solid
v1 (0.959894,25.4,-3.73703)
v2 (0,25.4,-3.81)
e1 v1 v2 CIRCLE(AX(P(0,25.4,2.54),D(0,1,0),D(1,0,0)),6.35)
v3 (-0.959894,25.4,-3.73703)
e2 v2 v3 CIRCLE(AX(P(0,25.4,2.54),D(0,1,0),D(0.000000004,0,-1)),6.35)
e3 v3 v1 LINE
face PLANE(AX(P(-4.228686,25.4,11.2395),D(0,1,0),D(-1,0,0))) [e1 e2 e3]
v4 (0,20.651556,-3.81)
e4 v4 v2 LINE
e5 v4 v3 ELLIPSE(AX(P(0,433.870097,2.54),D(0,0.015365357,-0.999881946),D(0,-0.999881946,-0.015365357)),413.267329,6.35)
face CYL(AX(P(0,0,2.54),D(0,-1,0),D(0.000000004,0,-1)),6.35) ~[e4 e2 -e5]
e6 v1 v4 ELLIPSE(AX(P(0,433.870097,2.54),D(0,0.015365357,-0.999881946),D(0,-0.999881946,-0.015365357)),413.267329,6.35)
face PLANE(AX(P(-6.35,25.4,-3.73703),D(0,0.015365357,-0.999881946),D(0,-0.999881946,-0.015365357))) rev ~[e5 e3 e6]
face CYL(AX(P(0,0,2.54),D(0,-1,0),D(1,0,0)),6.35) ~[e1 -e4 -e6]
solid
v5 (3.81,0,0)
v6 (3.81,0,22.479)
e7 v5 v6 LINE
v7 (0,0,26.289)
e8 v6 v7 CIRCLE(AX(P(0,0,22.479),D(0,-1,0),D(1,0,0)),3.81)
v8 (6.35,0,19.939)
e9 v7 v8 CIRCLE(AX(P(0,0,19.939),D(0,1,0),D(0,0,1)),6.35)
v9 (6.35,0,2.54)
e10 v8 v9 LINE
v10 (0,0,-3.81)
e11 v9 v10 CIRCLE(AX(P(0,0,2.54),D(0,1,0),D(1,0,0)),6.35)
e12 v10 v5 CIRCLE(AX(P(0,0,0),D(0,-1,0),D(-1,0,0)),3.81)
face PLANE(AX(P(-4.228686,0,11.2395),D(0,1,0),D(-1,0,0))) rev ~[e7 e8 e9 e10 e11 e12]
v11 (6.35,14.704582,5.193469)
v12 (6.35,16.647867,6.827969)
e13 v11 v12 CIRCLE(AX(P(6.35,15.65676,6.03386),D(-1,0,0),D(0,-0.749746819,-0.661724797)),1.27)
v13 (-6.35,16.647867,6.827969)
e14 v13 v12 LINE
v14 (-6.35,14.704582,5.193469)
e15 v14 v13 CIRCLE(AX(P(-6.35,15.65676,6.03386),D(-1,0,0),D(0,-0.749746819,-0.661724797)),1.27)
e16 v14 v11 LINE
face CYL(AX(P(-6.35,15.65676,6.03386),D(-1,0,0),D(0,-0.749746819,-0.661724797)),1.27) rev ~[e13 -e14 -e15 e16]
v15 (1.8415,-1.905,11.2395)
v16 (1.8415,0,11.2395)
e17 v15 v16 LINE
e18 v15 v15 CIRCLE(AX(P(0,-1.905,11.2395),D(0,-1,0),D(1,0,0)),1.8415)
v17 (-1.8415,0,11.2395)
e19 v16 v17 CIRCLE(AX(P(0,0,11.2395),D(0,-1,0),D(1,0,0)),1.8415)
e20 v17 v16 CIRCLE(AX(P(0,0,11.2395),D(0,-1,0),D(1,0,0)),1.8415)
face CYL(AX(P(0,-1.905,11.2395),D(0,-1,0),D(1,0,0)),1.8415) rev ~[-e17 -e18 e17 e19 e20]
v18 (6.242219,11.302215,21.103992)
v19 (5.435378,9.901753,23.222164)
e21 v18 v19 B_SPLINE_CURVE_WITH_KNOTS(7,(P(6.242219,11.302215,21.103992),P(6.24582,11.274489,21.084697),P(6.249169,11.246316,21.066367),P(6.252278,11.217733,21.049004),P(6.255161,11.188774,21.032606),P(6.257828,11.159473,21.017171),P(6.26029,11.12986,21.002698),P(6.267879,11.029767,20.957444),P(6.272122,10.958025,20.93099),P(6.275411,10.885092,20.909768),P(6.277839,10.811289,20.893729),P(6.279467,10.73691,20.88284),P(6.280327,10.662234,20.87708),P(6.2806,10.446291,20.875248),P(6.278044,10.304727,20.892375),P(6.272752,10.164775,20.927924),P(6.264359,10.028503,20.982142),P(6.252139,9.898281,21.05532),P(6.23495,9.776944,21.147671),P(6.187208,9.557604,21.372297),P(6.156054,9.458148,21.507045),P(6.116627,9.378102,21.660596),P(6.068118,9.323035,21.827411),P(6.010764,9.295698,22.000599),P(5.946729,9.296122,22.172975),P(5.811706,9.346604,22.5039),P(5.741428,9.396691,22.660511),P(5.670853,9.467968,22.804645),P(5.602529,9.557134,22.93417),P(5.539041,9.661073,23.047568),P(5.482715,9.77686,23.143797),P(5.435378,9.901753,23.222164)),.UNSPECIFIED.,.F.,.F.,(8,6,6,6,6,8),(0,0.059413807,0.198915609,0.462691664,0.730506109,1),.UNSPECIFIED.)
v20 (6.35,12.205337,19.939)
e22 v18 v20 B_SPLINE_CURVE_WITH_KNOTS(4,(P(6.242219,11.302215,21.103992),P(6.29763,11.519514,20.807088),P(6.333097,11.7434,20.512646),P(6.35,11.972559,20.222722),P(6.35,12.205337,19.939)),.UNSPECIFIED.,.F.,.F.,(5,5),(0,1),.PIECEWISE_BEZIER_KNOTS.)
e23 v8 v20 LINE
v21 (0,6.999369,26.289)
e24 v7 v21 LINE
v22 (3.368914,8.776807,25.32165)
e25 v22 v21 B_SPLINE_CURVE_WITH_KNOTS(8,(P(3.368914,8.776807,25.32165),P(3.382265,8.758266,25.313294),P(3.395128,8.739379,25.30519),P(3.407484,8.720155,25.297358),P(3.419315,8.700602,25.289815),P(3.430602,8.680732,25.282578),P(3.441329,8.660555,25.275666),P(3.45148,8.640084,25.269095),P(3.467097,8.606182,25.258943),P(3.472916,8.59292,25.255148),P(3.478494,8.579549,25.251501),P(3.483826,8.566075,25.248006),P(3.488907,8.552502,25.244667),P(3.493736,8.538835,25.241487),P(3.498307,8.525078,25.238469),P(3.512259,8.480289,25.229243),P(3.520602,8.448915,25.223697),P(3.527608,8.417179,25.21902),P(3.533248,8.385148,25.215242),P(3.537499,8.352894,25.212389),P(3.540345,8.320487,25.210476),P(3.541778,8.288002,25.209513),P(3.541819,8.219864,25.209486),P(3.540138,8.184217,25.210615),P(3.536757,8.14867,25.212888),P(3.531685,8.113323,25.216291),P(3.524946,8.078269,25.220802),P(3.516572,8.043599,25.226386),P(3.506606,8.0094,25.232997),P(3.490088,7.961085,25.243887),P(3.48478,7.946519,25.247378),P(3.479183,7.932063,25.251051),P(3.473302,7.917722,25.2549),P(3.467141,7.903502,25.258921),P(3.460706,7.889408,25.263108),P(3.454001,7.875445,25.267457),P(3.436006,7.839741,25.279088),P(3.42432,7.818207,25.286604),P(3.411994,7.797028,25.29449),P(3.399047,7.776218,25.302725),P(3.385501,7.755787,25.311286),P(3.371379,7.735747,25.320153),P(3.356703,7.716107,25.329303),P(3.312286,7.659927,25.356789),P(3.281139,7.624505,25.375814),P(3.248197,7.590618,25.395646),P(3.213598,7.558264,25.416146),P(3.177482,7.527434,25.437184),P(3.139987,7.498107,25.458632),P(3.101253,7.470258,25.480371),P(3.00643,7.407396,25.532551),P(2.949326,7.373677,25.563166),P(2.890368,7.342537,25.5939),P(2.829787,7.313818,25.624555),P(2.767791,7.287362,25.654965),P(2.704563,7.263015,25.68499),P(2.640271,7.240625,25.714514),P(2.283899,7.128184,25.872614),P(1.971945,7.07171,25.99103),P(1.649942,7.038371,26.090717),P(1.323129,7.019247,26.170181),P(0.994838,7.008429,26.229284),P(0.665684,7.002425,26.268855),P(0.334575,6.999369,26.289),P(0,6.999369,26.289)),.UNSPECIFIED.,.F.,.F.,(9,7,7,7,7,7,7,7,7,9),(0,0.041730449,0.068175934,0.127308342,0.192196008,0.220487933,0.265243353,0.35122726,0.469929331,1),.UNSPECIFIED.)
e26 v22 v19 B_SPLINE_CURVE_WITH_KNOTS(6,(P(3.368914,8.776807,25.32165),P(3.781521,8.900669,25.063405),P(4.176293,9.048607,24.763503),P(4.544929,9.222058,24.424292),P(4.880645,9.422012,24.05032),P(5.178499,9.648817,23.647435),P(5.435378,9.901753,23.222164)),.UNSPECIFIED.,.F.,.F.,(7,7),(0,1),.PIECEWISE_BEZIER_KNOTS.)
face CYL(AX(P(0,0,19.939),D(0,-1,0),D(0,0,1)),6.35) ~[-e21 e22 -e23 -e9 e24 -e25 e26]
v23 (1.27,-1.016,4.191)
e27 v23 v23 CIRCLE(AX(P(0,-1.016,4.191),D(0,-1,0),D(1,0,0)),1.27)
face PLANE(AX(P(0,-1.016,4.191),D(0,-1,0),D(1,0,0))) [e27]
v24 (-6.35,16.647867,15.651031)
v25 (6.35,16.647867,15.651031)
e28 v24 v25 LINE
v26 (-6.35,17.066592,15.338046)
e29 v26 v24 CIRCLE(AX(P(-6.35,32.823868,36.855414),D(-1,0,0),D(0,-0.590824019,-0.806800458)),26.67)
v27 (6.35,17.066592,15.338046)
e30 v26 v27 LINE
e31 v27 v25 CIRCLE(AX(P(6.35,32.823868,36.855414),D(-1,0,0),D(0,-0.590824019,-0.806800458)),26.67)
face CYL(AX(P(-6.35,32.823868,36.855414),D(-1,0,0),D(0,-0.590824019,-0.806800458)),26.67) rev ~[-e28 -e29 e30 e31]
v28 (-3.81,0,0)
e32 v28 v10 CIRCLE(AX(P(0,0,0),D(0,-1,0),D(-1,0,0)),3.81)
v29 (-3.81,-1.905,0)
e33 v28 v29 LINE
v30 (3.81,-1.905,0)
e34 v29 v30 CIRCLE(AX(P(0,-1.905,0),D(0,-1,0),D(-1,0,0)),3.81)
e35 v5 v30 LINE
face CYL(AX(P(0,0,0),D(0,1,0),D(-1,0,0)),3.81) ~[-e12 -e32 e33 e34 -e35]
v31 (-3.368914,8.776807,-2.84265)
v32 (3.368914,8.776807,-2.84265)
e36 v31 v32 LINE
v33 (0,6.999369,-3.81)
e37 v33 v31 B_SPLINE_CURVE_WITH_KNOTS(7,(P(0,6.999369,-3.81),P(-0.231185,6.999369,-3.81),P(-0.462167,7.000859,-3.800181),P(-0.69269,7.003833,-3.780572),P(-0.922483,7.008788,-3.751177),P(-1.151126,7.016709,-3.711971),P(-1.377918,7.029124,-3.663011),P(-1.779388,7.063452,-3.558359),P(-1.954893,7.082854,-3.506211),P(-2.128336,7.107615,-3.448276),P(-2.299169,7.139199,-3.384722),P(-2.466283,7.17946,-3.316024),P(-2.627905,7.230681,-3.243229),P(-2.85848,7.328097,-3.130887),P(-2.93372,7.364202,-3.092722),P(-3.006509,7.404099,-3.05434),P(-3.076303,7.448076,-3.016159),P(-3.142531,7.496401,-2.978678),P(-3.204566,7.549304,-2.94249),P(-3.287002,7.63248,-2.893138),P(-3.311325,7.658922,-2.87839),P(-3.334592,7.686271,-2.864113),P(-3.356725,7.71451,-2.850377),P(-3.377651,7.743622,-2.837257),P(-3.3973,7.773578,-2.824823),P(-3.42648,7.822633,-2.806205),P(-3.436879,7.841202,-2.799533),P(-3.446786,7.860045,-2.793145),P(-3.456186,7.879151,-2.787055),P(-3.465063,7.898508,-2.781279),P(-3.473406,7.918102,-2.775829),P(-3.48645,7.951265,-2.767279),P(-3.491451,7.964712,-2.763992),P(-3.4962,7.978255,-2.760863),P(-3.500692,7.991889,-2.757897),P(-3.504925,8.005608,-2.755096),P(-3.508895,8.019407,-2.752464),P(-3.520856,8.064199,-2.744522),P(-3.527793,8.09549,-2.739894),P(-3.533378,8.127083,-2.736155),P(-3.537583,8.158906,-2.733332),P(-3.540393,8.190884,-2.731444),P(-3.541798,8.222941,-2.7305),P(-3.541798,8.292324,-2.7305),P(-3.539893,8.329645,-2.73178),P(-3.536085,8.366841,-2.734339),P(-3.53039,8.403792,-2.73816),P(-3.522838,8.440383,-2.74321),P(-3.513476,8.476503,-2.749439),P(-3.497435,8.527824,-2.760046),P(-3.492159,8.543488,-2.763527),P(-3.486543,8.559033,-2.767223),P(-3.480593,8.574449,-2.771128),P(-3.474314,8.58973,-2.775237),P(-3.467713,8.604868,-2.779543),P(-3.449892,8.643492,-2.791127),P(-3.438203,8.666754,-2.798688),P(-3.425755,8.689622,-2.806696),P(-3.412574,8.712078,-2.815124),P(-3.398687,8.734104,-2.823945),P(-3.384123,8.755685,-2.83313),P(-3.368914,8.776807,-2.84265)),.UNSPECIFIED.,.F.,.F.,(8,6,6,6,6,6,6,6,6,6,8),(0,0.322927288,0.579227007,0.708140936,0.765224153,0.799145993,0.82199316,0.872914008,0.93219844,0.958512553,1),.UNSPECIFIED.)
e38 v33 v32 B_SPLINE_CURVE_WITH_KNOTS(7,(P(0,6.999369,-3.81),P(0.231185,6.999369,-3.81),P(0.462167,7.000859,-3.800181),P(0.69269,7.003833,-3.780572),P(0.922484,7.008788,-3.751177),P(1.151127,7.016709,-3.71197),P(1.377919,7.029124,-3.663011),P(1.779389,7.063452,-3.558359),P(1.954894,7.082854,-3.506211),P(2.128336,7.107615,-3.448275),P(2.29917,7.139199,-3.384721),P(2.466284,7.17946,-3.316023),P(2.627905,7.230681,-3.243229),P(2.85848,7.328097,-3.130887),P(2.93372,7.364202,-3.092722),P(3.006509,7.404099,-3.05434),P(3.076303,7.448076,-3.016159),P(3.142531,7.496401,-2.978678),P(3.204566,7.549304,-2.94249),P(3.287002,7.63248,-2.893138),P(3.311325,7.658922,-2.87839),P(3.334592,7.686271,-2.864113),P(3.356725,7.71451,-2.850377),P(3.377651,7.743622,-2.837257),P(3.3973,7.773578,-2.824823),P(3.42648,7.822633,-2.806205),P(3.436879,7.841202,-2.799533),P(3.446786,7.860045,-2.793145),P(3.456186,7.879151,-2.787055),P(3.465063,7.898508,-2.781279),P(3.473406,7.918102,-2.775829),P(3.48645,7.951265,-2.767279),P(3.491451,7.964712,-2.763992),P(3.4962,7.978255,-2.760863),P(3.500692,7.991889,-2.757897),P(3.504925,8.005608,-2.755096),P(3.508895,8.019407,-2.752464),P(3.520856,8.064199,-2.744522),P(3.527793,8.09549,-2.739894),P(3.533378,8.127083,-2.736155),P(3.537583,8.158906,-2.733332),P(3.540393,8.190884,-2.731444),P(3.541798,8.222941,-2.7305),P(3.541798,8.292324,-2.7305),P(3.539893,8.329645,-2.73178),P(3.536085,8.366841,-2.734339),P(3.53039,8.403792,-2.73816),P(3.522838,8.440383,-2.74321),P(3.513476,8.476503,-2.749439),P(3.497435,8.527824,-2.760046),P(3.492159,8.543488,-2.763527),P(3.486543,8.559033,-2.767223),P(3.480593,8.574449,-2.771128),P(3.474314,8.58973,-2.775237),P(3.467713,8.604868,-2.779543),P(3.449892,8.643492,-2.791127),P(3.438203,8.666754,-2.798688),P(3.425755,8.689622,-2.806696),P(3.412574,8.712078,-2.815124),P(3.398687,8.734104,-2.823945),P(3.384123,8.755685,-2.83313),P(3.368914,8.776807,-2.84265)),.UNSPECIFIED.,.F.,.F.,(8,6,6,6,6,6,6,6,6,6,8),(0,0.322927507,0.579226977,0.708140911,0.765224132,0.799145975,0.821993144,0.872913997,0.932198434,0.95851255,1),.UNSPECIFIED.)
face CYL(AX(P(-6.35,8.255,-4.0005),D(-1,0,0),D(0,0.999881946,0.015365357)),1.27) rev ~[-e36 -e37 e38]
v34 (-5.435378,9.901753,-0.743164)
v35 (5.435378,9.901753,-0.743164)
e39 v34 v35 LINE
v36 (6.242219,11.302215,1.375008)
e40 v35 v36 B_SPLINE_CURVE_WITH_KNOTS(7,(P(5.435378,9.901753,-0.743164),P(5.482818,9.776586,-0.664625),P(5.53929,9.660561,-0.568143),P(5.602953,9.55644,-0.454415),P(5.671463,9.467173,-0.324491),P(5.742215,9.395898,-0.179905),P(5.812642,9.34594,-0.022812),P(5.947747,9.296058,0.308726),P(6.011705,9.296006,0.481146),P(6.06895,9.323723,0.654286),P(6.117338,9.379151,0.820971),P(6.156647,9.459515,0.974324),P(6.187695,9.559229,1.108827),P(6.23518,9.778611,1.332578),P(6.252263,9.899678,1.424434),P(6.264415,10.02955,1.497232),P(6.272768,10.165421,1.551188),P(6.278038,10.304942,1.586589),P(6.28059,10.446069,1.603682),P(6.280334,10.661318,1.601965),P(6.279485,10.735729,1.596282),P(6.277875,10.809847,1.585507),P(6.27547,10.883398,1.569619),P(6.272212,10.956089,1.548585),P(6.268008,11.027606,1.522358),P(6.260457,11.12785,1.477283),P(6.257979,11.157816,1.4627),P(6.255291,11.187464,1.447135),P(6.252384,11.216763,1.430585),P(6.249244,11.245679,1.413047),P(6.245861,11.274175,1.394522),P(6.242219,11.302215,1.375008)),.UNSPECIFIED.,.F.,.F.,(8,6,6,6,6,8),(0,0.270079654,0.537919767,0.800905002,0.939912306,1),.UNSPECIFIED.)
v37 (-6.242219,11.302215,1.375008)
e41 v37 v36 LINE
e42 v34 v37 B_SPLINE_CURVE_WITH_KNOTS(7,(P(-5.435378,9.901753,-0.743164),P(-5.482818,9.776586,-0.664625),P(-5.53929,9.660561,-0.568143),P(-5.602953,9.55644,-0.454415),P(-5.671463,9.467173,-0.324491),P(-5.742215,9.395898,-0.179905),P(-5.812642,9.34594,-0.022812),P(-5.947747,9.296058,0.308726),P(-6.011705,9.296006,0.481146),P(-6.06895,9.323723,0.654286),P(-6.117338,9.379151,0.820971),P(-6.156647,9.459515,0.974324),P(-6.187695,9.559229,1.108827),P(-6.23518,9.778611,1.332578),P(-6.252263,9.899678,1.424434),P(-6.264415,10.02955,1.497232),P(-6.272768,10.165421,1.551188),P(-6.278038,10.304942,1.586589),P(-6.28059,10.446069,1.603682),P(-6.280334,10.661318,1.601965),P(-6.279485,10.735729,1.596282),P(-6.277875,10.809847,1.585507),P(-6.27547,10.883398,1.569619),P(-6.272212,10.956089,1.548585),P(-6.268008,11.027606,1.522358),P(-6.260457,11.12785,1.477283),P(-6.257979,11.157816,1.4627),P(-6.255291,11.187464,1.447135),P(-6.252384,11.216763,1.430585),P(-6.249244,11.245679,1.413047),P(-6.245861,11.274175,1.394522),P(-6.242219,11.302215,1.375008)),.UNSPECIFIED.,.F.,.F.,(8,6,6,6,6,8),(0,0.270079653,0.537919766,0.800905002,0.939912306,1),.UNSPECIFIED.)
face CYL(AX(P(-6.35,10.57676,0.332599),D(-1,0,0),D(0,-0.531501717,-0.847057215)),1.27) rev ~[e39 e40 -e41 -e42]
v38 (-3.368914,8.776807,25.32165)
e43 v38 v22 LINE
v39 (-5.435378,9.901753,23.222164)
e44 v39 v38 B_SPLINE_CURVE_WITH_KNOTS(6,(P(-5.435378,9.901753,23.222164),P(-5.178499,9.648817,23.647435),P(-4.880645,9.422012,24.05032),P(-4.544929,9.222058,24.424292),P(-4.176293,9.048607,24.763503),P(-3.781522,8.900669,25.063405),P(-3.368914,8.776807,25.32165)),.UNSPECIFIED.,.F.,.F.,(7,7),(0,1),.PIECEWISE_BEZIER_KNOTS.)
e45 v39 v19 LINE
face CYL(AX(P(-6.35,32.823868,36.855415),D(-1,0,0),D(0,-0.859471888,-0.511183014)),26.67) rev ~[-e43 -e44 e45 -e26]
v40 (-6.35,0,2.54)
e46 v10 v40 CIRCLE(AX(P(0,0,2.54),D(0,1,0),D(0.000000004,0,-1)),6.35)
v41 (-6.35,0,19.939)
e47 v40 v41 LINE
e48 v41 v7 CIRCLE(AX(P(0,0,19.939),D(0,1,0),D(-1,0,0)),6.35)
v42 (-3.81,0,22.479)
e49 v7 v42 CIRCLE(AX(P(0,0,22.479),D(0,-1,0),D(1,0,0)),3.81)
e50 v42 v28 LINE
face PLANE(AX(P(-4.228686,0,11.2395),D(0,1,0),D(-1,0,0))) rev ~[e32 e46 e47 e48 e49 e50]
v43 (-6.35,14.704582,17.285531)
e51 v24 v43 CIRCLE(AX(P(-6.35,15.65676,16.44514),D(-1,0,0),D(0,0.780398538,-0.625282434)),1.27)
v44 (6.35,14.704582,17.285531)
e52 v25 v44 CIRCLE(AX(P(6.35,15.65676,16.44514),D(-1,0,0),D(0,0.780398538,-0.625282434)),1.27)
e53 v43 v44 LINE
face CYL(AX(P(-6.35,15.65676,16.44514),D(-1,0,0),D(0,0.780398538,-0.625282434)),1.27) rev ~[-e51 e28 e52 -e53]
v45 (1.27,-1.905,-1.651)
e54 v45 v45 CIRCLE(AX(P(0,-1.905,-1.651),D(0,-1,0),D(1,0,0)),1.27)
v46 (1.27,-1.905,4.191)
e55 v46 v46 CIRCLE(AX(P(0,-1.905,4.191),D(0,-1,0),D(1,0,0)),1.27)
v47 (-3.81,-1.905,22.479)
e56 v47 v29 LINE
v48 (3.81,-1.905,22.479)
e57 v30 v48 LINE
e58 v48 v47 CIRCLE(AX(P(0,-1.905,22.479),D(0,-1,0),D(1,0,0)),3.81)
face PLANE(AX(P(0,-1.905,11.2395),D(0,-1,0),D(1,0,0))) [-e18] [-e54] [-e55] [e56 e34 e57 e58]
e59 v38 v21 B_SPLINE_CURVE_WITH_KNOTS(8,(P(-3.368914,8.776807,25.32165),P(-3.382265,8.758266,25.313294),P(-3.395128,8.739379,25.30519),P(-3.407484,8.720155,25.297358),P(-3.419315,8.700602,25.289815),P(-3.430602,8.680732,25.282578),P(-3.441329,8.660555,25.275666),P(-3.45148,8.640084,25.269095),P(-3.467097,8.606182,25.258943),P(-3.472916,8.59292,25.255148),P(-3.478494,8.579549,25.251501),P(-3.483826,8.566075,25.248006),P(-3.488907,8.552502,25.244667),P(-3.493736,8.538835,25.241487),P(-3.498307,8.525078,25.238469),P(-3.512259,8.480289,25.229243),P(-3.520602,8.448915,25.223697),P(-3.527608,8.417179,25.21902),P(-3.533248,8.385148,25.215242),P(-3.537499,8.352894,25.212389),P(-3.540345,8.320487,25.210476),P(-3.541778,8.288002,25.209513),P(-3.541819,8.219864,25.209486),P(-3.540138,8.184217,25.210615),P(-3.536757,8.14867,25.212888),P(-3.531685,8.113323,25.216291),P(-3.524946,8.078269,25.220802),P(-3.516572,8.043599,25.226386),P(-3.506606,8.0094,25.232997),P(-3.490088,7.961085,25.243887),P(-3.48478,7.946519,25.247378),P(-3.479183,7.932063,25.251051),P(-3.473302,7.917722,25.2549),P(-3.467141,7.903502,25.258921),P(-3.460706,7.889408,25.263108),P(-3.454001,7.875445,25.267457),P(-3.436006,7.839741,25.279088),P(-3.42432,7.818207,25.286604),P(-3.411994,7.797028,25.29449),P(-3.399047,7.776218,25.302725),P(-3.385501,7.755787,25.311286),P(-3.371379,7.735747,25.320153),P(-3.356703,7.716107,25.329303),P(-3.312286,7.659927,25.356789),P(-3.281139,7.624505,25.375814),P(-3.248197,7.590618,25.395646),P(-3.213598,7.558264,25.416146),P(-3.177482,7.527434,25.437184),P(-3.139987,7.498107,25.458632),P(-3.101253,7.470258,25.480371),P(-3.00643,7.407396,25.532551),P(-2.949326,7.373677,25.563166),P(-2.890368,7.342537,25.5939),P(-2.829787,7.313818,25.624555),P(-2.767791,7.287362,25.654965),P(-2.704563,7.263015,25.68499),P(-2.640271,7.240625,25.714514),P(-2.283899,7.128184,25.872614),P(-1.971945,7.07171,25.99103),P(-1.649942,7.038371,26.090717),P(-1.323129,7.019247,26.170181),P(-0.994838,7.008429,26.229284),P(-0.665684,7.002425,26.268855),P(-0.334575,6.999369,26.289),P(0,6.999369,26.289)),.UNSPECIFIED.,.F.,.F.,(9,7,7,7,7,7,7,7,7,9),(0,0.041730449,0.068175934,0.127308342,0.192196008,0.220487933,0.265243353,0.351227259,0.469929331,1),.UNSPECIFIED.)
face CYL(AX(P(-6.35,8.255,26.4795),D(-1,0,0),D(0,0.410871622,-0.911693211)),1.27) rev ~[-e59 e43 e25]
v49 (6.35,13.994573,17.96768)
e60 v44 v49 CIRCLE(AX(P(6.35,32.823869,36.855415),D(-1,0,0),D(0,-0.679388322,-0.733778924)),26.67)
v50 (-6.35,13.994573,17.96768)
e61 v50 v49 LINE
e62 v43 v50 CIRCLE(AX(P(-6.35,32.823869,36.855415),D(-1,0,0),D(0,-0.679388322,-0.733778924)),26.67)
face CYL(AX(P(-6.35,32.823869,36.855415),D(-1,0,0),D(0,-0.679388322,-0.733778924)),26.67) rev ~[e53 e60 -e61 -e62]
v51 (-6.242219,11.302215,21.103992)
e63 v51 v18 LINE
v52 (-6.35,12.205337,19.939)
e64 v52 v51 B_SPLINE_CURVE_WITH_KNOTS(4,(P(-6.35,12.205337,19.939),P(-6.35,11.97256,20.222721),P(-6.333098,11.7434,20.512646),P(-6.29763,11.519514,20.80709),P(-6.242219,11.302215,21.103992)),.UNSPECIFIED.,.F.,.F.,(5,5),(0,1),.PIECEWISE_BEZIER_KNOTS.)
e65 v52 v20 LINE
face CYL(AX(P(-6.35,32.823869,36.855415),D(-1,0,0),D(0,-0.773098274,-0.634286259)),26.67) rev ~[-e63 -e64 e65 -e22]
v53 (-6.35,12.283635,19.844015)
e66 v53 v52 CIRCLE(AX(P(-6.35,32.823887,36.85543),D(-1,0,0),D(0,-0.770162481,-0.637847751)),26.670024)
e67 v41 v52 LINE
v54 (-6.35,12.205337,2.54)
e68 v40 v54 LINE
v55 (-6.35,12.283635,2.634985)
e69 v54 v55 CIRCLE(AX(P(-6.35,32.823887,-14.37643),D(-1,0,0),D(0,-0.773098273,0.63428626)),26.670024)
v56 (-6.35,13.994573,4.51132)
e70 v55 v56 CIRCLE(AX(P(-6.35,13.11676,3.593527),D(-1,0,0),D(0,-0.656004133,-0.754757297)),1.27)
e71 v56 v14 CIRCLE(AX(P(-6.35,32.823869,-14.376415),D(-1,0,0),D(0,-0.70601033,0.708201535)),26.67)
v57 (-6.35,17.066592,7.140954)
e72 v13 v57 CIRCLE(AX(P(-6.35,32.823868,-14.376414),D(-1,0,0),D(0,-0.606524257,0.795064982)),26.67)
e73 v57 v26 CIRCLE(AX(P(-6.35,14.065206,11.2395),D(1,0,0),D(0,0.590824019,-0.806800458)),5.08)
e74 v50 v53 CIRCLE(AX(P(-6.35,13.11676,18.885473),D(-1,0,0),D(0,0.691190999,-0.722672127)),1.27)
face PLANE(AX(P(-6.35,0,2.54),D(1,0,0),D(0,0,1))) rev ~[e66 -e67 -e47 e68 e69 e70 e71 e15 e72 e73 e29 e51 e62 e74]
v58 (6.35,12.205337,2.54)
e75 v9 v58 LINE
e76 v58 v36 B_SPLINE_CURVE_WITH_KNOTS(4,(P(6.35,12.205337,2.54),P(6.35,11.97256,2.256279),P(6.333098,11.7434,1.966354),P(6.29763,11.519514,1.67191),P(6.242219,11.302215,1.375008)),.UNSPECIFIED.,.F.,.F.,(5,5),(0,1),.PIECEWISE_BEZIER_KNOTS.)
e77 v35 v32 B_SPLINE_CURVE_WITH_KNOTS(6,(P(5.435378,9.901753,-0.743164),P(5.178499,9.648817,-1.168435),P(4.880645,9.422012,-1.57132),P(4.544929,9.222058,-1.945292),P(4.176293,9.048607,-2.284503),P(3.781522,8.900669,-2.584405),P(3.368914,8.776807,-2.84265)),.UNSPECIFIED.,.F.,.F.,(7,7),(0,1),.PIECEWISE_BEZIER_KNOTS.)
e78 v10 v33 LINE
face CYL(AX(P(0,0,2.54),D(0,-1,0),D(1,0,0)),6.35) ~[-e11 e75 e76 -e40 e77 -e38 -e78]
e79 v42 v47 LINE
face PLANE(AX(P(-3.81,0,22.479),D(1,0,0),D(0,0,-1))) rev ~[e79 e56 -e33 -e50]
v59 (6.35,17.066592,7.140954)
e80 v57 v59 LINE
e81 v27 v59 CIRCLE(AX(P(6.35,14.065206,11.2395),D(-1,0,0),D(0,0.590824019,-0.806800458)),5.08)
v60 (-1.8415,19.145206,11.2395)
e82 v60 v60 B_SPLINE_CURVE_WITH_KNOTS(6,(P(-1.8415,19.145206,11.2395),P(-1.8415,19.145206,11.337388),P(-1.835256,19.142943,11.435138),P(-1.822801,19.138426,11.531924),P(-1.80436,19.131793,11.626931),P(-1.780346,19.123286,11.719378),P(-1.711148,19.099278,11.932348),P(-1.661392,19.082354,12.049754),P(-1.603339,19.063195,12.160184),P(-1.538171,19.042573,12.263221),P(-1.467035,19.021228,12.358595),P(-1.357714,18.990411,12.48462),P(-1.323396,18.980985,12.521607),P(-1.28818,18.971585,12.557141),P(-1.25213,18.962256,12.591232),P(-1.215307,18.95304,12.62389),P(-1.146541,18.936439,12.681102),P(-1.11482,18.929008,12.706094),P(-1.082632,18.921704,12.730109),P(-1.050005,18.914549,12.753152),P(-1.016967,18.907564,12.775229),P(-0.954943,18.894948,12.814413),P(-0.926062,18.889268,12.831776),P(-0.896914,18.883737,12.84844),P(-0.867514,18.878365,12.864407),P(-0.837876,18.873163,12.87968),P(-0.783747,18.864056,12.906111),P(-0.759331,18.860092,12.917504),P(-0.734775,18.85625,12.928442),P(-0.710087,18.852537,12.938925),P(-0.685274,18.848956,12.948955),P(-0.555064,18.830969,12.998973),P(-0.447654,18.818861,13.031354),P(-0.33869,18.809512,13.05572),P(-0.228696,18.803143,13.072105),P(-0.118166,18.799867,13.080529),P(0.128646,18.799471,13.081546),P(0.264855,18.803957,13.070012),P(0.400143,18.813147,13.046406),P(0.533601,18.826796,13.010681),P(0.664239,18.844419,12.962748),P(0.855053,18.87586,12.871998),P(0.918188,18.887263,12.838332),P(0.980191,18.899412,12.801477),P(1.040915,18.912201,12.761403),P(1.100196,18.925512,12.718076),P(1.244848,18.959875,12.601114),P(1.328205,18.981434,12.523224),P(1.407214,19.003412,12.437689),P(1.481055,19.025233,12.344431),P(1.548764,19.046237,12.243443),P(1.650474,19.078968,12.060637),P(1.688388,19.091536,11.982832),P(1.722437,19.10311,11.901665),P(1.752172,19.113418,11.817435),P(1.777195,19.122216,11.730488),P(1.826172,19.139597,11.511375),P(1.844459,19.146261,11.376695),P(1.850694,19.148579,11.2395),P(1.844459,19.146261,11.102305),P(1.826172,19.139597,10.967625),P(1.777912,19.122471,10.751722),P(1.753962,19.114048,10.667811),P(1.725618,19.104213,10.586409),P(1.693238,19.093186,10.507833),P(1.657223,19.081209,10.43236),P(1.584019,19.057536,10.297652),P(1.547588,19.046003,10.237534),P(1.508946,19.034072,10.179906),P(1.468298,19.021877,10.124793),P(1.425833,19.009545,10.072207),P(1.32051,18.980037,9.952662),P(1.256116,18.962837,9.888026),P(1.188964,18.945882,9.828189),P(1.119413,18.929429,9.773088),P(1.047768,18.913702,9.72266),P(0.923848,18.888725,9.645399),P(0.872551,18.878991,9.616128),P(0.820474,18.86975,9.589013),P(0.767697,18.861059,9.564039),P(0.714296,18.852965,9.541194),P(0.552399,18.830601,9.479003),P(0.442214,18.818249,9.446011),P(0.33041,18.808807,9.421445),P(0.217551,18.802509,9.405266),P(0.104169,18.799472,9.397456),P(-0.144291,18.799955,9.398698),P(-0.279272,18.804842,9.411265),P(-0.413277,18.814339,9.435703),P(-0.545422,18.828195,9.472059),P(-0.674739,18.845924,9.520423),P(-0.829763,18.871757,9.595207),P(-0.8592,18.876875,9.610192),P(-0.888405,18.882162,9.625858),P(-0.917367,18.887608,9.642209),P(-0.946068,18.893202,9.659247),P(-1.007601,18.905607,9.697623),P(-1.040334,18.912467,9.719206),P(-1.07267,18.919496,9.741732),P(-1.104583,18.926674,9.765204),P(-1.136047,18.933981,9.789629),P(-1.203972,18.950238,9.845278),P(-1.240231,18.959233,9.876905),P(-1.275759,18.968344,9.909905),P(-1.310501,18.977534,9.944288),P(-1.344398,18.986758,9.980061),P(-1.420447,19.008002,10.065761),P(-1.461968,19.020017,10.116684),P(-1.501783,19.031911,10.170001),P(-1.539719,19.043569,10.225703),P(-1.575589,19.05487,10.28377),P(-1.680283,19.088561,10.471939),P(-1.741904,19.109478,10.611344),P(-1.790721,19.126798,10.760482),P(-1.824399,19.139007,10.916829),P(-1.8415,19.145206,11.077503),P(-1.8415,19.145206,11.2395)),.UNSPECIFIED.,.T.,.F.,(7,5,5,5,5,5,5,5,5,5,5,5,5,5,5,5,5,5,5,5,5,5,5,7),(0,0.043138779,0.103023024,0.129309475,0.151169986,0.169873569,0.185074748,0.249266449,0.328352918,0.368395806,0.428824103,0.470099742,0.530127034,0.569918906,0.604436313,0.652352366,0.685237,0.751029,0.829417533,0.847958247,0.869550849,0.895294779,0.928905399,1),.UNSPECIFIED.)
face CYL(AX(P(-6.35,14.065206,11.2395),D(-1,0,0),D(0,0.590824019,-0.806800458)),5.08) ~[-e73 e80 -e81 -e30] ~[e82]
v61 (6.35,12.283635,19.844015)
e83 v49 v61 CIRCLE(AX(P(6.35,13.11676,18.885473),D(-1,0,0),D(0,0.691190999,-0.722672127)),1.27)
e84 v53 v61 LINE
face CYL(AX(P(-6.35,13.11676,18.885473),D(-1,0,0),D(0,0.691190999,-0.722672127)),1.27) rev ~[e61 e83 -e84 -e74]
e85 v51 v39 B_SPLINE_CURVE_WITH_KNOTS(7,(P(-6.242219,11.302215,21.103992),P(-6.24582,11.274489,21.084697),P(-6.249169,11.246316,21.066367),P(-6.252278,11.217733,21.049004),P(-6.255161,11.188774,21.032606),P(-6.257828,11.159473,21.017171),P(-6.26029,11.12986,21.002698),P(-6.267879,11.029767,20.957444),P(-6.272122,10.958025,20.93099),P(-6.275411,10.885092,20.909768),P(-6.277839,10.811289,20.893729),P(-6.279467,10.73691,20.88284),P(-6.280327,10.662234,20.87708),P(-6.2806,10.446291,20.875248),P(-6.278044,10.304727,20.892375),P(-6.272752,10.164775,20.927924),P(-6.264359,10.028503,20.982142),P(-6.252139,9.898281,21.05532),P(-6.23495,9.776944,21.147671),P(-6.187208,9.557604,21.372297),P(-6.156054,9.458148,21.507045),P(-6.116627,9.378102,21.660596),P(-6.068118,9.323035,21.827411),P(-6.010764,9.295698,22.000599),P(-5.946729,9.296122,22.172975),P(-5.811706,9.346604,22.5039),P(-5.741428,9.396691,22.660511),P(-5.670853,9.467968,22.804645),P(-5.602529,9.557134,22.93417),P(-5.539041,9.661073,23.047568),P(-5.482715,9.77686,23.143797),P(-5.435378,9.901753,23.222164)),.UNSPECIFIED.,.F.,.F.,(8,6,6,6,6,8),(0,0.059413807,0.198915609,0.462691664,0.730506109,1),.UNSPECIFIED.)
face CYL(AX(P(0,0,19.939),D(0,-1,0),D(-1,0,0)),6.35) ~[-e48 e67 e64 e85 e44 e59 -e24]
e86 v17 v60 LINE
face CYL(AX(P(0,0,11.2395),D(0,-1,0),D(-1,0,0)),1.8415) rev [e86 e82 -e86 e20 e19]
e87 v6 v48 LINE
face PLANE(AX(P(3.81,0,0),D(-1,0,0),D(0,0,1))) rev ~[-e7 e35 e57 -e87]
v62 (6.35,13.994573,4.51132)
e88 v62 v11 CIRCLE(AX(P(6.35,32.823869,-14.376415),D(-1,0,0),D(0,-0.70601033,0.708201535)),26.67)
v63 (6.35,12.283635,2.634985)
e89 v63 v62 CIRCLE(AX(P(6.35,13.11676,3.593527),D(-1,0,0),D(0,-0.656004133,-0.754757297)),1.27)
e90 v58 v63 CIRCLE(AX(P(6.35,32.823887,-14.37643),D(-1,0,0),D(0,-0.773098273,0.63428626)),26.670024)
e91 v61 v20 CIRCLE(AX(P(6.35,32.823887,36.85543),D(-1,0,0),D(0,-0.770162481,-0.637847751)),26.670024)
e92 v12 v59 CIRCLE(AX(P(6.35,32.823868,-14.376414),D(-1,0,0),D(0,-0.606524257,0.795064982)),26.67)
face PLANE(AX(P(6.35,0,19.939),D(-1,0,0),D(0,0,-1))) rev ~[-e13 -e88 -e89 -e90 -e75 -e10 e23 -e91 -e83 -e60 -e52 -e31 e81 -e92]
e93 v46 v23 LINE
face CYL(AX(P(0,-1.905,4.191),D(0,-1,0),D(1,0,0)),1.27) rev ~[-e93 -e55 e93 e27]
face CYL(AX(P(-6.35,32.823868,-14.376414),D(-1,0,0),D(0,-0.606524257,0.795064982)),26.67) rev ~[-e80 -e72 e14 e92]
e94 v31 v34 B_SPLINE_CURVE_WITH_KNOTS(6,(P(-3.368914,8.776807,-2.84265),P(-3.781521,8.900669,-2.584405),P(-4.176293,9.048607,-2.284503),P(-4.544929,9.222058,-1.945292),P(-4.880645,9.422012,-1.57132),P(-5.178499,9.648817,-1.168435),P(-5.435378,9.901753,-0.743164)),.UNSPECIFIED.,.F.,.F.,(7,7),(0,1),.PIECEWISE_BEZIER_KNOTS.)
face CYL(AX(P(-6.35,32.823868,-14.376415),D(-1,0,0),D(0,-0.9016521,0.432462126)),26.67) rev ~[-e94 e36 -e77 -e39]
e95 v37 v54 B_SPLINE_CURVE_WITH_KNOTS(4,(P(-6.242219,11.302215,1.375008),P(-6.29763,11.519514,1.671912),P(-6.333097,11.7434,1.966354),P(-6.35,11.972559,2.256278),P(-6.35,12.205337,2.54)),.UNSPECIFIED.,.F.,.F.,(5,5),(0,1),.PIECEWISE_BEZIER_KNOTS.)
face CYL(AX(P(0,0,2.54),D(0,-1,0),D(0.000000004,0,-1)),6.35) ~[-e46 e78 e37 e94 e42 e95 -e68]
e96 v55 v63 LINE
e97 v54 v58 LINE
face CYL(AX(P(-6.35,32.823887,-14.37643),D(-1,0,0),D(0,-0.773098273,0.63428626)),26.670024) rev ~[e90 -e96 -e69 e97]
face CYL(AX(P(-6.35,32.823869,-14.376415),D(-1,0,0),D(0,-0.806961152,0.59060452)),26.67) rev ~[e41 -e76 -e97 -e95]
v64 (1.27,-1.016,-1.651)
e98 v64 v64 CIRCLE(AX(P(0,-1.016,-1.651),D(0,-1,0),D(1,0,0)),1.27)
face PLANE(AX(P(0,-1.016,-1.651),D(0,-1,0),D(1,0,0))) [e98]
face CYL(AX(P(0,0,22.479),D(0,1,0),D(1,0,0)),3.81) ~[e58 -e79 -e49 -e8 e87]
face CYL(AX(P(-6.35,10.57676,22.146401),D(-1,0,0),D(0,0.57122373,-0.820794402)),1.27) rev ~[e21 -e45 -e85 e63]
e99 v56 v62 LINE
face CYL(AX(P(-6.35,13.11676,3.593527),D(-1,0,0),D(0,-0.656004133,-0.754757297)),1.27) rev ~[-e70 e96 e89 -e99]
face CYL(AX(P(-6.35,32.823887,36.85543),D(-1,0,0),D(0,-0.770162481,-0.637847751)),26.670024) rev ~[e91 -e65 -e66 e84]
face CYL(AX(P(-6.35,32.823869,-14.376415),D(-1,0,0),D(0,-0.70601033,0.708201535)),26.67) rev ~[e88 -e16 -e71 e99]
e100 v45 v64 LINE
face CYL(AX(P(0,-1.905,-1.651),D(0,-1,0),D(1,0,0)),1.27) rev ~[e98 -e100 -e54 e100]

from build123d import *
from build123d import SkipClean  # not in build123d's __all__

# Parameters (mm, degrees)
F1_DEPTH = 1.905
F2_R     = 1.27
F3_DEPTH = 0.889
F2_R_2   = 1.8415
F4_DEPTH = 25.4
F5_R     = 1.8415
F6_DEPTH = 25.4
F8_DEPTH = 25.4


# Not quite as in the source:
# - after a boolean that leaves OpenCascade's solid faulty, fix() repairs it


with BuildPart() as f1:
    # F0 (on Front) → F1 (new body)
    with BuildSketch(Plane.XZ):
        with BuildLine():
            Line((-3.81, 22.479), (-3.81, 0))
            ThreePointArc((-3.81, 0), (0, -3.81), (3.81, 0))
            Line((3.81, 0), (3.81, 22.479))
            ThreePointArc((3.81, 22.479), (0, 26.289), (-3.81, 22.479))
        make_face()
    extrude(amount=F1_DEPTH)

    # F2 (on face) → F3 (cut)
    with BuildSketch(Plane.XZ.offset(1.905)):
        with Locations((0, 4.191)):
            Circle(F2_R)
        with Locations((0, -1.651)):
            Circle(F2_R)
    extrude(amount=-F3_DEPTH, mode=Mode.SUBTRACT)

    # F2 (on face) → F4 (cut)
    with BuildSketch(Plane.XZ.offset(1.905)):
        with Locations((0, 11.2395)):
            Circle(F2_R_2)
    extrude(amount=-F4_DEPTH, mode=Mode.SUBTRACT)

    # F5 (on face) → F6 (join)
    with BuildSketch(Plane(origin=(0, 0, 0), x_dir=(-1, 0, 0), z_dir=(0, 1, 0))):
        with BuildLine():
            Line((6.35, 2.54), (6.35, 19.939))
            ThreePointArc((6.35, 19.939), (4.4901280605, 24.4291280605), (0, 26.289))
            ThreePointArc((0, 26.289), (2.6940768363, 25.1730768363), (3.81, 22.479))
            Line((3.81, 22.479), (3.81, 0))
            ThreePointArc((3.81, 0), (2.6940768283, -2.6940768443), (-2.26e-08, -3.81))
            ThreePointArc((-2.26e-08, -3.81), (4.4901280526, -1.9501280685), (6.35, 2.54))
        make_face()
        with BuildLine():
            ThreePointArc((3.81, 22.479), (2.6940768363, 25.1730768363), (0, 26.289))
            ThreePointArc((0, 26.289), (-2.6940768363, 25.1730768363), (-3.81, 22.479))
            Line((-3.81, 22.479), (-3.81, 0))
            ThreePointArc((-3.81, 0), (-2.6940768443, -2.6940768283), (-2.26e-08, -3.81))
            ThreePointArc((-2.26e-08, -3.81), (2.6940768283, -2.6940768443), (3.81, 0))
            Line((3.81, 0), (3.81, 22.479))
        make_face()
        with Locations((0, 11.2395)):
            Circle(F5_R, mode=Mode.SUBTRACT)
        with BuildLine():
            ThreePointArc((-3.81, 22.479), (-2.6940768363, 25.1730768363), (0, 26.289))
            ThreePointArc((0, 26.289), (-4.4901280605, 24.4291280605), (-6.35, 19.939))
            Line((-6.35, 19.939), (-6.35, 2.54))
            ThreePointArc((-6.35, 2.54), (-4.4901280685, -1.9501280526), (-2.26e-08, -3.81))
            ThreePointArc((-2.26e-08, -3.81), (-2.6940768443, -2.6940768283), (-3.81, 0))
            Line((-3.81, 0), (-3.81, 22.479))
        make_face()
    with SkipClean():  # cleaning this boolean's faces spoils the solid; the shape is the same uncleaned
        extrude(amount=F6_DEPTH)

    # F7 (on face) → F8 (cut)
    with BuildSketch(Plane(origin=(-6.35, 0, 0), x_dir=(0, -1, 0), z_dir=(-1, 0, 0))):
        with BuildLine():
            Line((-25.4, 19.939), (-12.2053374914, 19.939))
            ThreePointArc((-12.2053374914, 19.939), (-11.7457258145, 20.5152553369), (-11.302214531, 21.1039919914))
            ThreePointArc((-11.302214531, 21.1039919914), (-9.5173742951, 21.4459716607), (-9.9017532138, 23.2221635447))
            ThreePointArc((-9.9017532138, 23.2221635447), (-9.3158304407, 24.2593417985), (-8.7768069595, 25.3216496223))
            ThreePointArc((-8.7768069595, 25.3216496223), (-7.181162456, 27.1575655787), (-9.5247212955, 26.5061051072))
            Line((-9.5247212955, 26.5061051072), (-25.4, 26.8387477845))
            Line((-25.4, 26.8387477845), (-25.4, 19.939))
        make_face()
        with BuildLine():
            ThreePointArc((-17.0665918725, 7.1409536759), (-19.1452058545, 11.2395), (-17.0665918725, 15.3380463241))
            ThreePointArc((-17.0665918725, 15.3380463241), (-16.856462314, 15.4935129075), (-16.647866537, 15.6510314514))
            ThreePointArc((-16.647866537, 15.6510314514), (-14.839279057, 15.4732223146), (-14.7045819334, 17.2855306346))
            ThreePointArc((-14.7045819334, 17.2855306346), (-14.3464292382, 17.6233283273), (-13.9945729627, 17.9676795951))
            ThreePointArc((-13.9945729627, 17.9676795951), (-12.1783266761, 18.0297617042), (-12.2836351449, 19.8440149633))
            ThreePointArc((-12.2836351449, 19.8440149633), (-12.2444315173, 19.8914623085), (-12.2053374914, 19.939))
            Line((-12.2053374914, 19.939), (-25.4, 19.939))
            Line((-25.4, 19.939), (-25.4, 2.54))
            Line((-25.4, 2.54), (-12.2053374914, 2.54))
            ThreePointArc((-12.2053374914, 2.54), (-12.2444315173, 2.5875376915), (-12.2836351449, 2.6349850367))
            ThreePointArc((-12.2836351449, 2.6349850367), (-12.1783266761, 4.4492382958), (-13.9945729627, 4.5113204049))
            ThreePointArc((-13.9945729627, 4.5113204049), (-14.3464292382, 4.8556716727), (-14.7045819334, 5.1934693654))
            ThreePointArc((-14.7045819334, 5.1934693654), (-14.839279057, 7.0057776854), (-16.647866537, 6.8279685486))
            ThreePointArc((-16.647866537, 6.8279685486), (-16.856462314, 6.9854870925), (-17.0665918725, 7.1409536759))
        make_face()
        with BuildLine():
            ThreePointArc((-11.302214531, 1.3750080086), (-11.7457258145, 1.9637446631), (-12.2053374914, 2.54))
            Line((-12.2053374914, 2.54), (-25.4, 2.54))
            Line((-25.4, 2.54), (-25.4, -3.7370298523))
            Line((-25.4, -3.7370298523), (-9.5248500713, -3.9809859967))
            ThreePointArc((-9.5248500713, -3.9809859967), (-7.193651257, -4.6979516798), (-8.7768069595, -2.8426496223))
            ThreePointArc((-8.7768069595, -2.8426496223), (-9.3158304407, -1.7803417985), (-9.9017532138, -0.7431635447))
            ThreePointArc((-9.9017532138, -0.7431635447), (-9.5173742951, 1.0330283393), (-11.302214531, 1.3750080086))
        make_face()
    extrude(amount=-F8_DEPTH, mode=Mode.SUBTRACT)

    add(f1.part.fix(), mode=Mode.REPLACE)


solid = f1.part
